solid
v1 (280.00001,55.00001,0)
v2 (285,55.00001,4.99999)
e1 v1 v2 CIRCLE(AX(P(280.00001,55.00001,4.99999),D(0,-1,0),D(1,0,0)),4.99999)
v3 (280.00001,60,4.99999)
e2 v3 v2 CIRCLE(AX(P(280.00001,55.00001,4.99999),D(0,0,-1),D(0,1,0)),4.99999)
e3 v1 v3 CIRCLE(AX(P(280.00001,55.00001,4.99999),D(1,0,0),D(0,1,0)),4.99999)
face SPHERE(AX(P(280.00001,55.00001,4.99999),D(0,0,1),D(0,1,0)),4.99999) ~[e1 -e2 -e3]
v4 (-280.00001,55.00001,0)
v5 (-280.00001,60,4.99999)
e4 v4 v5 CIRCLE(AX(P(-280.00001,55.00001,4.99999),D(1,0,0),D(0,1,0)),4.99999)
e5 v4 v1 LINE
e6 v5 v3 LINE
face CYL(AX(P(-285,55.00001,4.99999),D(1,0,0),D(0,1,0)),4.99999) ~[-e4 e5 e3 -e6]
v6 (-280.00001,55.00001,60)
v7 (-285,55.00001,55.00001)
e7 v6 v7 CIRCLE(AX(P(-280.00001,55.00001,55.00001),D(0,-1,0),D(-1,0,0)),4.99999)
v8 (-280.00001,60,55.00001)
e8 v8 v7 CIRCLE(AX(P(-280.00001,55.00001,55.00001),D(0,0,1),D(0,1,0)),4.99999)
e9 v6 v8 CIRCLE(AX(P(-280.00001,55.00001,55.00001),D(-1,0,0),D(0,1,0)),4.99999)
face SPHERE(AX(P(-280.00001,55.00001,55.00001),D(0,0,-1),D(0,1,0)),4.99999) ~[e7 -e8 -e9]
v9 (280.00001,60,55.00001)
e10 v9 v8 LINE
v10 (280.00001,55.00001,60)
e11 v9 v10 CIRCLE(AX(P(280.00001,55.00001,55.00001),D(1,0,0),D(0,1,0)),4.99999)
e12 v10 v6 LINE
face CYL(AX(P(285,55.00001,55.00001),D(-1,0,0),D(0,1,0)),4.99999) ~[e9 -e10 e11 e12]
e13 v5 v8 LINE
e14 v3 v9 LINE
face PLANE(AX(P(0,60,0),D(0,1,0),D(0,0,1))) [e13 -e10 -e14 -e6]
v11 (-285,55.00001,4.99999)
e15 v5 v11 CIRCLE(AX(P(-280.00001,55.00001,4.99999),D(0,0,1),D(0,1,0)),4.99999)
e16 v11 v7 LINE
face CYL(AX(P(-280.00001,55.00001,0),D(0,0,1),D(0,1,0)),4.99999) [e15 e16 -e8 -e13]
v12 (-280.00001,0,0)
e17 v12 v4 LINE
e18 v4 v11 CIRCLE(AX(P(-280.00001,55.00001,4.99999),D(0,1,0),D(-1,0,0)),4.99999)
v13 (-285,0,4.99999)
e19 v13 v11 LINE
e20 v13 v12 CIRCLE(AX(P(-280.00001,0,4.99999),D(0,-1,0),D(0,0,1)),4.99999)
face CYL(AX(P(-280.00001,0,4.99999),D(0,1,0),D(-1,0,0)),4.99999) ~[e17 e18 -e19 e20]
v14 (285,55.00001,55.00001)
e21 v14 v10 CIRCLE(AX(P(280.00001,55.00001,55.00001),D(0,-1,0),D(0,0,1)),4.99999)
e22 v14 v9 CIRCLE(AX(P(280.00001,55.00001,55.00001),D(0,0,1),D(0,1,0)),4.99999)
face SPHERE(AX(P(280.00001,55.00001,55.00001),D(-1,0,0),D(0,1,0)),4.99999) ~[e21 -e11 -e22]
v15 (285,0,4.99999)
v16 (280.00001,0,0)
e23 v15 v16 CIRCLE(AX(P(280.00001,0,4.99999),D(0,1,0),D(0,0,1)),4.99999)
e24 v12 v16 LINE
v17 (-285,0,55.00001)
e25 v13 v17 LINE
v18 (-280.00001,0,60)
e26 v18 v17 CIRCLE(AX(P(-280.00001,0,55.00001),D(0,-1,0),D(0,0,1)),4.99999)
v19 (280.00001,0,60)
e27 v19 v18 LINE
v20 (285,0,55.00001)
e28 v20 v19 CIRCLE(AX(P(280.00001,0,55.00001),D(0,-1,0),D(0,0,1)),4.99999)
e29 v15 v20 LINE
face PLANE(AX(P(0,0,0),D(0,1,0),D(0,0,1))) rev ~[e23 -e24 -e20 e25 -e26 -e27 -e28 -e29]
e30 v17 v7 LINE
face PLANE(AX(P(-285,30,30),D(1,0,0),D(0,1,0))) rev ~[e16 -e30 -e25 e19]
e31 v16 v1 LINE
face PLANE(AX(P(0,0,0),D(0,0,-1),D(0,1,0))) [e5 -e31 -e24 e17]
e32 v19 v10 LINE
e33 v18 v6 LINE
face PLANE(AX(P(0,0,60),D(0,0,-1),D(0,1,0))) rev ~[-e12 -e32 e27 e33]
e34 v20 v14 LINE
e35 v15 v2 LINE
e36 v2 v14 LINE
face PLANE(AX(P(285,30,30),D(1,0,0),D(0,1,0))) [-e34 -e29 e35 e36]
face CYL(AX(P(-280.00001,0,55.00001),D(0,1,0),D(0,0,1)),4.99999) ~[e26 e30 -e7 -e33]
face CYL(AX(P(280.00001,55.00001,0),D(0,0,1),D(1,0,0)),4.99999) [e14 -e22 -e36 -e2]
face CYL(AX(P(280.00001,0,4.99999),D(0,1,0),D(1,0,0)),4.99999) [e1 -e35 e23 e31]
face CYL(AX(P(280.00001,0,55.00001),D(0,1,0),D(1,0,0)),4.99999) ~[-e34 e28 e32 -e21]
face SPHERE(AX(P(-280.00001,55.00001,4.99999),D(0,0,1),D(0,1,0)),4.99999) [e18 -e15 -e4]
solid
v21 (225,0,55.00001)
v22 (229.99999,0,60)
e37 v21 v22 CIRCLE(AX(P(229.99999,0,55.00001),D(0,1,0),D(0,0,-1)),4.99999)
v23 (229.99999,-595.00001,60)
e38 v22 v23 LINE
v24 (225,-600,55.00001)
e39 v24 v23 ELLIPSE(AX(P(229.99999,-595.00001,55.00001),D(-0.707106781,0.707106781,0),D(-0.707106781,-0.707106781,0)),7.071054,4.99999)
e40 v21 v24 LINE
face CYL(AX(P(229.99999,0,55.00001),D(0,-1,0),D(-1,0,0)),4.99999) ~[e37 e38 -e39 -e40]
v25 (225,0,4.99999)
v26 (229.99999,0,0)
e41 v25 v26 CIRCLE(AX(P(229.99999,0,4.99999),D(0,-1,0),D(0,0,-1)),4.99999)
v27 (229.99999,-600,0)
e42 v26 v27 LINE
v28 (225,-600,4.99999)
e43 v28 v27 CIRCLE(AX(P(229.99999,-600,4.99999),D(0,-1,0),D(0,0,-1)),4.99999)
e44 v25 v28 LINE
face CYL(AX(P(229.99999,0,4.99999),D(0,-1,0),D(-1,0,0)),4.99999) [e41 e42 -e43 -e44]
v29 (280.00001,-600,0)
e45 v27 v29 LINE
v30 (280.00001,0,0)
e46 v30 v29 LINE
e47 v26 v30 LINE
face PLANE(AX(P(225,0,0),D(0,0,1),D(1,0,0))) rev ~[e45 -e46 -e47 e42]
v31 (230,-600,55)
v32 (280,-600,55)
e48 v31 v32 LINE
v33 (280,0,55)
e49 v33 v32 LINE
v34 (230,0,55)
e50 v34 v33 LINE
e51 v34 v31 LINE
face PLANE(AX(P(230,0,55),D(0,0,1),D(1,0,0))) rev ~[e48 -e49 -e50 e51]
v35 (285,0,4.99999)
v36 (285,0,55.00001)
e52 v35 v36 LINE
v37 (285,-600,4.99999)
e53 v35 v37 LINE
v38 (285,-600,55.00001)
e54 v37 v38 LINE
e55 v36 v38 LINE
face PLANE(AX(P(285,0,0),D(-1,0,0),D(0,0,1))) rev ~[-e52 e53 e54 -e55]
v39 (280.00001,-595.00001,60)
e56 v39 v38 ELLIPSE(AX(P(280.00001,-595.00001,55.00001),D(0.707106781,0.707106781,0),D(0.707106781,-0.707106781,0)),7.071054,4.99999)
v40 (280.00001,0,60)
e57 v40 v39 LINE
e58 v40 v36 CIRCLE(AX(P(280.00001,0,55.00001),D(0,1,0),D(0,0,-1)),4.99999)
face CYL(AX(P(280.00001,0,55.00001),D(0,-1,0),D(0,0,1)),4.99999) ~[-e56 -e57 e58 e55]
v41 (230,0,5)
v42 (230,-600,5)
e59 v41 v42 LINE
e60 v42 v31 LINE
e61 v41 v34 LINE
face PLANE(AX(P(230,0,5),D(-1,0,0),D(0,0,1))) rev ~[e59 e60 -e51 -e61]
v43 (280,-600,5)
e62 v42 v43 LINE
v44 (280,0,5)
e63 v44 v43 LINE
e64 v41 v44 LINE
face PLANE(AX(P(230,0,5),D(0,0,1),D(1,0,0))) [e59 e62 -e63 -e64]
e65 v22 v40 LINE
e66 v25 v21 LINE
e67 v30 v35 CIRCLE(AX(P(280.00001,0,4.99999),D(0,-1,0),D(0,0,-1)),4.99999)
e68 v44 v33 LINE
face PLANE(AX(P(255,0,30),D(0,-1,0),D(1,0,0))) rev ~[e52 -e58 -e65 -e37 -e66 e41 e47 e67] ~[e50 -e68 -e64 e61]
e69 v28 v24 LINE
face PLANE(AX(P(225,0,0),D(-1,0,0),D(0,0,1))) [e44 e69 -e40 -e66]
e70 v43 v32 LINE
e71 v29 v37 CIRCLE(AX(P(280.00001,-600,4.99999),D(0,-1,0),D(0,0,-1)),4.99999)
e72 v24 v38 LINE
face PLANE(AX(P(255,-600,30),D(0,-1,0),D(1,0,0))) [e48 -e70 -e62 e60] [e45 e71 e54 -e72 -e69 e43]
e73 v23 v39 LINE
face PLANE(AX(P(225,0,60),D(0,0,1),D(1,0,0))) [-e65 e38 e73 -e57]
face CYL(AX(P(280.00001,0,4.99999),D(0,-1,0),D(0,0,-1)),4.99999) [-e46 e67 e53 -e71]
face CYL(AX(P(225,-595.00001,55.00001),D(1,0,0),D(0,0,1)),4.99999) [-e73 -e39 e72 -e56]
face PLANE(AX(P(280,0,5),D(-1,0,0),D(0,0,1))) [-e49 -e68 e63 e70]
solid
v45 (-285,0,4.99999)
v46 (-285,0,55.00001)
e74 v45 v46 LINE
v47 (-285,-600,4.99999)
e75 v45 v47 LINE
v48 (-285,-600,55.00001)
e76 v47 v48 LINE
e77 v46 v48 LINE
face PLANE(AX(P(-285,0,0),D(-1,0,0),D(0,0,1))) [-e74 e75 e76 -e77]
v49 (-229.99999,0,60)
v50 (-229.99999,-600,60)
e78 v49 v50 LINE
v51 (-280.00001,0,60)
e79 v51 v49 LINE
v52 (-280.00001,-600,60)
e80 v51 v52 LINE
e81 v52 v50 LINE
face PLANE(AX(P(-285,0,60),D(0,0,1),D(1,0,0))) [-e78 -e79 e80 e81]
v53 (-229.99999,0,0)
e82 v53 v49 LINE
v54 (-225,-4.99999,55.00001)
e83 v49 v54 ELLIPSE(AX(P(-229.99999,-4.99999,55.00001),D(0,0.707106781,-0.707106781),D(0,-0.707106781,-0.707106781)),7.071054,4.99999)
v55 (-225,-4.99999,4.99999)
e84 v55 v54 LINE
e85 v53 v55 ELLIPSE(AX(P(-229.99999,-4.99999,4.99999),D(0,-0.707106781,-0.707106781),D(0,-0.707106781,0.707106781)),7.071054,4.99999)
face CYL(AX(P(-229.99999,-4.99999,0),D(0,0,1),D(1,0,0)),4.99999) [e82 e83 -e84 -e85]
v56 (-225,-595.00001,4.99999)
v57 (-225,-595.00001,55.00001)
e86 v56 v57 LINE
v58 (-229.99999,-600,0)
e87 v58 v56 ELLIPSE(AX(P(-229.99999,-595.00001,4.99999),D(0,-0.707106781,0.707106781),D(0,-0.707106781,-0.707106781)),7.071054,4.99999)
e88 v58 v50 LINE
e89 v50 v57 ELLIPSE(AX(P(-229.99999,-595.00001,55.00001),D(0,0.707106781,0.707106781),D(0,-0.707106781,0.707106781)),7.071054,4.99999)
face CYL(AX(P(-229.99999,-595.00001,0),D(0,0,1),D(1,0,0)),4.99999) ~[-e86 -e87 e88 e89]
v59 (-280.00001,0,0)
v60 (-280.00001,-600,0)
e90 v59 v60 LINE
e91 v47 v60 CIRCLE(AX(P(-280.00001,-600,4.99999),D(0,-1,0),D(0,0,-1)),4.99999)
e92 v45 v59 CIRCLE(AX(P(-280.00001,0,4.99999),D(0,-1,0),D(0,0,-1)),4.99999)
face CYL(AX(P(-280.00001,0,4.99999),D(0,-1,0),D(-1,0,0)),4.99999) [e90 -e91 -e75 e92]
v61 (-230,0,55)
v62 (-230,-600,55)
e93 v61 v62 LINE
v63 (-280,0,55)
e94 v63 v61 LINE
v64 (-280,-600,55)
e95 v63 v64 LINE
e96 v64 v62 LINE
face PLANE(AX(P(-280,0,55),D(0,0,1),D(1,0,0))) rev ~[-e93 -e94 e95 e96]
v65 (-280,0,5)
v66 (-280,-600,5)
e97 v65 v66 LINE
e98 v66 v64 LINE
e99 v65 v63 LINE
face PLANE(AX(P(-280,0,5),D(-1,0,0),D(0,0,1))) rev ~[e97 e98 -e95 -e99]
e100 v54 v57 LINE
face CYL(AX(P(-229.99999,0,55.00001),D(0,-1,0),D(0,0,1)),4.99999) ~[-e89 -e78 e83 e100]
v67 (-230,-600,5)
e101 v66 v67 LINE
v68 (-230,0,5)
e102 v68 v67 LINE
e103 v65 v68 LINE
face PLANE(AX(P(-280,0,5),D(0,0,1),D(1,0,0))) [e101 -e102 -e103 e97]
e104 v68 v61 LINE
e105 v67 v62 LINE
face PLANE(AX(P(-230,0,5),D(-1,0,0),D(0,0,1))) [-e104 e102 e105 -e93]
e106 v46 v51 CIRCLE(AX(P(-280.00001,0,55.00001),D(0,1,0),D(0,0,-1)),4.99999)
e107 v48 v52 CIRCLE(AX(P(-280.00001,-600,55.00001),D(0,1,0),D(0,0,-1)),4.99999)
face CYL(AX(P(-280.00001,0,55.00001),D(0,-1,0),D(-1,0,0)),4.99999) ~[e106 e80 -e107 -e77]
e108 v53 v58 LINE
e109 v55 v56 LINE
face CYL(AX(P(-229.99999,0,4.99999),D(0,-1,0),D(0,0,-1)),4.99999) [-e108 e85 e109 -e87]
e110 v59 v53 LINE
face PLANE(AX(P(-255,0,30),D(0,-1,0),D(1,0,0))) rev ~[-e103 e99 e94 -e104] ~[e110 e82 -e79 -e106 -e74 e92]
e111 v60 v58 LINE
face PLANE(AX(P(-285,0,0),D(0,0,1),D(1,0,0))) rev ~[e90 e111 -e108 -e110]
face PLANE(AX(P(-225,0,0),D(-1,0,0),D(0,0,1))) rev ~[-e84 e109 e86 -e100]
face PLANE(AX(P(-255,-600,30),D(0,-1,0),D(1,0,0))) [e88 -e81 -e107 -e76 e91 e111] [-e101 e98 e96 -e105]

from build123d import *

# Parameters (mm, degrees)
F0_W     = 60
F0_H     = 60
F0_W_2   = 50
F0_H_2   = 50
F1_DEPTH = 600
F2_W     = 60
F2_H     = 60
F3_DEPTH = 285
F4_R     = 4.99999
F4_2_R   = 4.99999
F4_3_R   = 4.99999


# Not quite as in the source:
# - a fillet or chamfer is up to 0.001 mm smaller than in the source, because OpenCascade refuses the exact size


with BuildPart() as f1:
    # F0 (on Front) → F1 (new body)
    with BuildSketch(Plane.XZ):
        with Locations((255, 30)):
            Rectangle(F0_W, F0_H)
        with Locations((255, 30)):
            Rectangle(F0_W_2, F0_H_2, mode=Mode.SUBTRACT)
    extrude(amount=F1_DEPTH)

    # F4#3 (radius 5 in the source; OpenCascade refuses exactly that, so slightly less here)
    f4_3_edges = [f1.edges().sort_by_distance(p)[0] for p in [
        (225, -300, 60),
        (255, -600, 60),
        (285, -300, 60),
        (285, -300, 0),
        (225, -300, 0),
    ]]
    fillet(f4_3_edges, radius=F4_3_R)


with BuildPart() as f1b:
    # F0 (on Front) → F1, piece 2 (new body)
    with BuildSketch(Plane.XZ):
        with Locations((-255, 30)):
            Rectangle(F0_W, F0_H)
        with Locations((-255, 30)):
            Rectangle(F0_W_2, F0_H_2, mode=Mode.SUBTRACT)
    extrude(amount=F1_DEPTH)

    # F4#2 (radius 5 in the source; OpenCascade refuses exactly that, so slightly less here)
    f4_2_edges = [f1b.edges().sort_by_distance(p)[0] for p in [
        (-225, -300, 0),
        (-225, -300, 60),
        (-225, 0, 30),
        (-225, -600, 30),
        (-285, -300, 60),
        (-285, -300, 0),
    ]]
    fillet(f4_2_edges, radius=F4_2_R)


with BuildPart() as f3:
    # F2 (on Right) → F3 (new body, symmetric)
    with BuildSketch(Plane.YZ):
        with Locations((30, 30)):
            Rectangle(F2_W, F2_H)
    extrude(amount=F3_DEPTH, both=True)

    # F4 (radius 5 in the source; OpenCascade refuses exactly that, so slightly less here)
    f4_edges = [f3.edges().sort_by_distance(p)[0] for p in [
        (-285, 60, 30),
        (0, 60, 60),
        (285, 60, 30),
        (0, 60, 0),
        (-285, 30, 60),
        (-285, 30, 0),
        (285, 30, 60),
        (285, 30, 0),
    ]]
    fillet(f4_edges, radius=F4_R)


solid = Compound([f1.part, f1b.part, f3.part])
